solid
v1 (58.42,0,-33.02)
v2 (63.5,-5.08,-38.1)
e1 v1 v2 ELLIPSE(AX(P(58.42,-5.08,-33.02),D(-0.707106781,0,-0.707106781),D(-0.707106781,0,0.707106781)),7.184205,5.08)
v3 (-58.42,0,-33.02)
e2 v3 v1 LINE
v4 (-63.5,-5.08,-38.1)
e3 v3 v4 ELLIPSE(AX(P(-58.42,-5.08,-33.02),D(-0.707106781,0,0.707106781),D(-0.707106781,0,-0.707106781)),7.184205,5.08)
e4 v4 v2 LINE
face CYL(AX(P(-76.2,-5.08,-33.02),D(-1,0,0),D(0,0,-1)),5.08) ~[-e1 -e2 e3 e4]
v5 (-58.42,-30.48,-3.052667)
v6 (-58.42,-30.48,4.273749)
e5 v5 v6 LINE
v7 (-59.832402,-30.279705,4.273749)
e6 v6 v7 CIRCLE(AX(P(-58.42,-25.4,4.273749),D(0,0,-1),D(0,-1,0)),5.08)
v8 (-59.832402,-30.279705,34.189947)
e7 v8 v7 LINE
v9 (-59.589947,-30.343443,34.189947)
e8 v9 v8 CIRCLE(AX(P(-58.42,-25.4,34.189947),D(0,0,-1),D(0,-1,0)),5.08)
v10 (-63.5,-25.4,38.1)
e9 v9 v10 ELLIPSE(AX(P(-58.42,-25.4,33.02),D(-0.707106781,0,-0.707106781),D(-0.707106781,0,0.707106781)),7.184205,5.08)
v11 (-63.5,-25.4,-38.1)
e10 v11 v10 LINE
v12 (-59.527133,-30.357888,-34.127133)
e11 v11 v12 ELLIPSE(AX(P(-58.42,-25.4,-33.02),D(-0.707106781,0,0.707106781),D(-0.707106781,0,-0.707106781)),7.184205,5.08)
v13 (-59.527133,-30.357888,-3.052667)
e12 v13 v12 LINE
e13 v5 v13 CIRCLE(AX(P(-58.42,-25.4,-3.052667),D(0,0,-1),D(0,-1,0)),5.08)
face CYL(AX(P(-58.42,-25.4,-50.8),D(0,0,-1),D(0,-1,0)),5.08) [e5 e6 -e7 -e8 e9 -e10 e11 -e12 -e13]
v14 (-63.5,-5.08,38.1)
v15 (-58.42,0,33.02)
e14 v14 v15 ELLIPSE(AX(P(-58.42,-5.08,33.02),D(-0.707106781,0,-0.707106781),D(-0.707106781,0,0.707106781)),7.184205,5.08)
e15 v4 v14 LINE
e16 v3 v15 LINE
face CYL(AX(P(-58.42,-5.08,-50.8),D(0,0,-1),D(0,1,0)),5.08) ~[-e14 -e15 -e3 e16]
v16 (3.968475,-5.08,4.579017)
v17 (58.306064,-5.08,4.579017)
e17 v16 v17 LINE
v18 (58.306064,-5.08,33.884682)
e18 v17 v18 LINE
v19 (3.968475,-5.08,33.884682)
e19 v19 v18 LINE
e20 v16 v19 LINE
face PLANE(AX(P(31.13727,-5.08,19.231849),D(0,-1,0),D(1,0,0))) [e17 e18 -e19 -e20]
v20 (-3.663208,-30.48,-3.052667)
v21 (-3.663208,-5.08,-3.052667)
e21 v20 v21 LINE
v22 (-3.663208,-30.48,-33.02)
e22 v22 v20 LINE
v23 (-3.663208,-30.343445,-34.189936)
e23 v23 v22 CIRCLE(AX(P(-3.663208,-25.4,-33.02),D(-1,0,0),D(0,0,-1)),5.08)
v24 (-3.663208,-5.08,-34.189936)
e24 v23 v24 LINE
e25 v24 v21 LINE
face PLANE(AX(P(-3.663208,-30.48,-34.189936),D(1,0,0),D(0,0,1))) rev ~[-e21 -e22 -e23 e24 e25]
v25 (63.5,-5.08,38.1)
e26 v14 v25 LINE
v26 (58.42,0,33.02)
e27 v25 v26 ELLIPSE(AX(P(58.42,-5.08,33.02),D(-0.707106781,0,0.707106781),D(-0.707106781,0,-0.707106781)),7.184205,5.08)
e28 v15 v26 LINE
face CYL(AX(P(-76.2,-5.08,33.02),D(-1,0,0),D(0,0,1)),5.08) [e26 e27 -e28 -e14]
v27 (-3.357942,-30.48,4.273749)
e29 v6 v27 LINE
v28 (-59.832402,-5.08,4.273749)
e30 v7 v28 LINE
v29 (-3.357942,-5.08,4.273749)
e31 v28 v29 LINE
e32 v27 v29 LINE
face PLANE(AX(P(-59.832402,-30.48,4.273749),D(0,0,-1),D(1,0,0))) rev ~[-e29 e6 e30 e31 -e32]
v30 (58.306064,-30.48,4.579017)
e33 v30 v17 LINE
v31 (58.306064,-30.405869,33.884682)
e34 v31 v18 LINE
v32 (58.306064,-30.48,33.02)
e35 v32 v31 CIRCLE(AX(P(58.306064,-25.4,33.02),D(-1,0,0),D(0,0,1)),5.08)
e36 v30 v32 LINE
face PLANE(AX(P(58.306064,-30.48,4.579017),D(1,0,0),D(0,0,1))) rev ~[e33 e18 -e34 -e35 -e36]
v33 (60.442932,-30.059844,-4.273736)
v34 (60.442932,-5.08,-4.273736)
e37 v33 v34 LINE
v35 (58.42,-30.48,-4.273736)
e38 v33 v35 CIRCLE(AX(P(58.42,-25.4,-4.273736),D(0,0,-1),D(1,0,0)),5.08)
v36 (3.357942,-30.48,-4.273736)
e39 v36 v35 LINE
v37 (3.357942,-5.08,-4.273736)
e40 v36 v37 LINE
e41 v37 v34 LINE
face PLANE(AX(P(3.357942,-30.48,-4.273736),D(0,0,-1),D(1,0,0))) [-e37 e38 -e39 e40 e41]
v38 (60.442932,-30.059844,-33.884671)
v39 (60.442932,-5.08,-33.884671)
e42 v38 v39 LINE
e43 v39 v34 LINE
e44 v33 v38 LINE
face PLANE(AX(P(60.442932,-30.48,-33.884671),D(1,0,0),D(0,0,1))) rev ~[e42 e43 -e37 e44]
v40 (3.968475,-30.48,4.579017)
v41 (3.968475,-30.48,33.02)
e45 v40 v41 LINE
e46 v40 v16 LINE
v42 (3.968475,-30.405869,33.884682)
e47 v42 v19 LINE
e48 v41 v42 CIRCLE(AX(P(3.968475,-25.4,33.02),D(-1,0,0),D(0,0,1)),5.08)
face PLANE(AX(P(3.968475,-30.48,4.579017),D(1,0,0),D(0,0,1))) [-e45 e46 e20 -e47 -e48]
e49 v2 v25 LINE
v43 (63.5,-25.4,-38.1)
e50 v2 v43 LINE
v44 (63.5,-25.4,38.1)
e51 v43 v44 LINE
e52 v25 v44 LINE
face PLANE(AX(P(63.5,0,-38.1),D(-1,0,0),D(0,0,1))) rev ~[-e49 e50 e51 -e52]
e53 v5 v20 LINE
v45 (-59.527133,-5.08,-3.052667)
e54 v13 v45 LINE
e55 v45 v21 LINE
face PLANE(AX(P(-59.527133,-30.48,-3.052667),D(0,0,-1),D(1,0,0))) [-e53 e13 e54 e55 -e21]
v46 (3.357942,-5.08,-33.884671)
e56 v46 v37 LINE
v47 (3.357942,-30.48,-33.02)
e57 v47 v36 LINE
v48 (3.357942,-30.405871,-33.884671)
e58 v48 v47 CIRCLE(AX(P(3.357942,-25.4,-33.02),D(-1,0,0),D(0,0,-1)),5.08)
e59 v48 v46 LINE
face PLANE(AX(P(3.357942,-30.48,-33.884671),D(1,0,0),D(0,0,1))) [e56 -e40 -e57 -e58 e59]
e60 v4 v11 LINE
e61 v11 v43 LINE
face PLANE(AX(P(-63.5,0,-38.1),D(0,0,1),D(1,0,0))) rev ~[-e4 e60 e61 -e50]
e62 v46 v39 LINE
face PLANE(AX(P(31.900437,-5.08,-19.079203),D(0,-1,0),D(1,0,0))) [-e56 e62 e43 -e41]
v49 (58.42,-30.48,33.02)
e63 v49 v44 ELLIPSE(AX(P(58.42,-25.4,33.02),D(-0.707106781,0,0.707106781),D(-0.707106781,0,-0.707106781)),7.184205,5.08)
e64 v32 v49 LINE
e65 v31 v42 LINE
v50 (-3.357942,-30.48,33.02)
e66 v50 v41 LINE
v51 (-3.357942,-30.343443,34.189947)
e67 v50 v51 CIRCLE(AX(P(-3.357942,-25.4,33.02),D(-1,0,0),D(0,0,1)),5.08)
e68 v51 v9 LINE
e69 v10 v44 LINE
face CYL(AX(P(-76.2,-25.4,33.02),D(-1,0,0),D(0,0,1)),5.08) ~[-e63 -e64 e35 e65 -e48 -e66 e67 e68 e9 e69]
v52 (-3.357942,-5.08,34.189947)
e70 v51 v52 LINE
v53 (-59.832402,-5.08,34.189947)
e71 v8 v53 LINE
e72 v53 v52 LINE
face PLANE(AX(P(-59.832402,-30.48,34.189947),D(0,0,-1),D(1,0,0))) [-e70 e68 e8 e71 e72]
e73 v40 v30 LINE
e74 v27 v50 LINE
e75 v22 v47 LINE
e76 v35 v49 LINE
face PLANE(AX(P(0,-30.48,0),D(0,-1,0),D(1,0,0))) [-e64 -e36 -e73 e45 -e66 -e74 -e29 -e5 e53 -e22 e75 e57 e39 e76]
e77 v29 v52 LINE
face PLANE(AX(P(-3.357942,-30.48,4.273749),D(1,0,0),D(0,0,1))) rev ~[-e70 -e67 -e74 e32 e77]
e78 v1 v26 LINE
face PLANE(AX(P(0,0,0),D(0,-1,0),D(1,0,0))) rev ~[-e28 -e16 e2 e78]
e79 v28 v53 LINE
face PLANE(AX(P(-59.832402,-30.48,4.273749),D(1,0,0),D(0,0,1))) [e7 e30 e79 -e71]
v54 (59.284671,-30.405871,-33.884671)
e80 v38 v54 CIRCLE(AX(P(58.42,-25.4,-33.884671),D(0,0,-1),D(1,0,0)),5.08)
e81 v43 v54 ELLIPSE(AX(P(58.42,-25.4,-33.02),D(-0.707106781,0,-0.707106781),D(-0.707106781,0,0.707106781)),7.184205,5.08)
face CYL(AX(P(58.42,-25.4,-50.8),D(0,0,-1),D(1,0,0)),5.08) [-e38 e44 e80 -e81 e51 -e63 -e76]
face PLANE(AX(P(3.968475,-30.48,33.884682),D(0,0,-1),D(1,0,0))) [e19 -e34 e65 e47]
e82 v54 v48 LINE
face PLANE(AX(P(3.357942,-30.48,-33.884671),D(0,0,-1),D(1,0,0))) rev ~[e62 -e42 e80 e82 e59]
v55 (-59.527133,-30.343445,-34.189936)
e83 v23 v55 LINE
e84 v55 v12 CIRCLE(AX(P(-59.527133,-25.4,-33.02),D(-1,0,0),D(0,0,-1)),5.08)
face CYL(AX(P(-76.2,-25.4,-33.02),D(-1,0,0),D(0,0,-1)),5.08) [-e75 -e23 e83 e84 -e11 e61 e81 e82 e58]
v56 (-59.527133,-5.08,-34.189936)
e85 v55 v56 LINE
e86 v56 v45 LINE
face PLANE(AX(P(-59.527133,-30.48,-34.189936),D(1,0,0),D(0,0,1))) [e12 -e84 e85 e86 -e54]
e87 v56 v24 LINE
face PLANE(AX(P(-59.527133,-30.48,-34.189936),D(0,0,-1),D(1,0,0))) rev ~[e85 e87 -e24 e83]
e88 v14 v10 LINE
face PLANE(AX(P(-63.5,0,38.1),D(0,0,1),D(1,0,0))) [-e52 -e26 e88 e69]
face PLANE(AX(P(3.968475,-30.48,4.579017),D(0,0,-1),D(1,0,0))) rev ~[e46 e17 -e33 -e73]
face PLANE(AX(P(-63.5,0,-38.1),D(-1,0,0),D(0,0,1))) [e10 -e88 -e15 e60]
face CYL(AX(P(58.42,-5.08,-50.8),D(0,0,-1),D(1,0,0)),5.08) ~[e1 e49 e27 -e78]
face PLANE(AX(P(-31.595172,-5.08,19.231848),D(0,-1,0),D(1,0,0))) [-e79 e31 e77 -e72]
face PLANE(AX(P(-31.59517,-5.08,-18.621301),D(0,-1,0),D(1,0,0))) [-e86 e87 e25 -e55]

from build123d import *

# Parameters (mm, degrees)
F0_W        = 127
F0_H        = 76.2
F1_DEPTH    = 30.48
F2_W        = 56.4744591247
F2_H        = 29.9161975272
F2_W_2      = 54.3375890702
F2_H_2      = 29.3056648225
F2_W_3      = 57.0849904325
F2_H_3      = 29.6109346673
F2_W_4      = 55.8639247902
F2_H_4      = 31.1372692231
F3_DEPTH    = 25.4
F4_T1_DEPTH = 152.4
F4_T3_DEPTH = 101.6


# Not quite as in the source:
# - a fillet or chamfer that OpenCascade refuses, or shapes differently, is made with other operations: its cross-section is extruded or revolved along the edge and cut away or added


with BuildPart() as f1:
    # F0 (on Front) → F1 (new body)
    with BuildSketch(Plane.XZ):
        Rectangle(F0_W, F0_H)
    extrude(amount=F1_DEPTH)

    # F2 (on face) → F3 (cut)
    with BuildSketch(Plane.XZ.offset(30.48)):
        with Locations((-31.5951720113, 19.2318481859)):
            Rectangle(F2_W, F2_H)
        with Locations((31.1372699216, 19.23184935)):
            Rectangle(F2_W_2, F2_H_2)
        with Locations((31.9004367338, -19.0792032517)):
            Rectangle(F2_W_3, F2_H_3)
        with Locations((-31.5951702651, -18.6213011621)):
            Rectangle(F2_W_4, F2_H_4)
    extrude(amount=-F3_DEPTH, mode=Mode.SUBTRACT)

    # F4: fillet of radius 5.08 on 8 edges, made by hand

    # F4_s2 → F4_t1 (cut)
    with BuildSketch(Plane.YZ.offset(-76.2)):
        with BuildLine():
            ThreePointArc((-25.4, -38.1), (-28.9921024484, -36.6121024484), (-30.48, -33.02))
            Line((-30.48, -33.02), (-30.48, -38.1))
            Line((-30.48, -38.1), (-25.4, -38.1))
        make_face()
        with BuildLine():
            ThreePointArc((-25.4, 38.1), (-28.9921024484, 36.6121024484), (-30.48, 33.02))
            Line((-30.48, 33.02), (-30.48, 38.1))
            Line((-30.48, 38.1), (-25.4, 38.1))
        make_face()
        with BuildLine():
            ThreePointArc((-5.08, -38.1), (-1.4878975516, -36.6121024484), (0, -33.02))
            Line((0, -33.02), (0, -38.1))
            Line((0, -38.1), (-5.08, -38.1))
        make_face()
        with BuildLine():
            ThreePointArc((-5.08, 38.1), (-1.4878975516, 36.6121024484), (0, 33.02))
            Line((0, 33.02), (0, 38.1))
            Line((0, 38.1), (-5.08, 38.1))
        make_face()
    extrude(amount=F4_T1_DEPTH, mode=Mode.SUBTRACT)

    # F4_s4 → F4_t3 (cut)
    with BuildSketch(Plane.XY.offset(-50.8)):
        with BuildLine():
            ThreePointArc((-58.42, -30.48), (-62.0121024484, -28.9921024484), (-63.5, -25.4))
            Line((-63.5, -25.4), (-63.5, -30.48))
            Line((-63.5, -30.48), (-58.42, -30.48))
        make_face()
        with BuildLine():
            ThreePointArc((63.5, -25.4), (62.0121024484, -28.9921024484), (58.42, -30.48))
            Line((58.42, -30.48), (63.5, -30.48))
            Line((63.5, -30.48), (63.5, -25.4))
        make_face()
        with BuildLine():
            ThreePointArc((-58.42, 0), (-62.0121024484, -1.4878975516), (-63.5, -5.08))
            Line((-63.5, -5.08), (-63.5, 0))
            Line((-63.5, 0), (-58.42, 0))
        make_face()
        with BuildLine():
            ThreePointArc((63.5, -5.08), (62.0121024484, -1.4878975516), (58.42, 0))
            Line((58.42, 0), (63.5, 0))
            Line((63.5, 0), (63.5, -5.08))
        make_face()
    extrude(amount=F4_T3_DEPTH, mode=Mode.SUBTRACT)


solid = f1.part
